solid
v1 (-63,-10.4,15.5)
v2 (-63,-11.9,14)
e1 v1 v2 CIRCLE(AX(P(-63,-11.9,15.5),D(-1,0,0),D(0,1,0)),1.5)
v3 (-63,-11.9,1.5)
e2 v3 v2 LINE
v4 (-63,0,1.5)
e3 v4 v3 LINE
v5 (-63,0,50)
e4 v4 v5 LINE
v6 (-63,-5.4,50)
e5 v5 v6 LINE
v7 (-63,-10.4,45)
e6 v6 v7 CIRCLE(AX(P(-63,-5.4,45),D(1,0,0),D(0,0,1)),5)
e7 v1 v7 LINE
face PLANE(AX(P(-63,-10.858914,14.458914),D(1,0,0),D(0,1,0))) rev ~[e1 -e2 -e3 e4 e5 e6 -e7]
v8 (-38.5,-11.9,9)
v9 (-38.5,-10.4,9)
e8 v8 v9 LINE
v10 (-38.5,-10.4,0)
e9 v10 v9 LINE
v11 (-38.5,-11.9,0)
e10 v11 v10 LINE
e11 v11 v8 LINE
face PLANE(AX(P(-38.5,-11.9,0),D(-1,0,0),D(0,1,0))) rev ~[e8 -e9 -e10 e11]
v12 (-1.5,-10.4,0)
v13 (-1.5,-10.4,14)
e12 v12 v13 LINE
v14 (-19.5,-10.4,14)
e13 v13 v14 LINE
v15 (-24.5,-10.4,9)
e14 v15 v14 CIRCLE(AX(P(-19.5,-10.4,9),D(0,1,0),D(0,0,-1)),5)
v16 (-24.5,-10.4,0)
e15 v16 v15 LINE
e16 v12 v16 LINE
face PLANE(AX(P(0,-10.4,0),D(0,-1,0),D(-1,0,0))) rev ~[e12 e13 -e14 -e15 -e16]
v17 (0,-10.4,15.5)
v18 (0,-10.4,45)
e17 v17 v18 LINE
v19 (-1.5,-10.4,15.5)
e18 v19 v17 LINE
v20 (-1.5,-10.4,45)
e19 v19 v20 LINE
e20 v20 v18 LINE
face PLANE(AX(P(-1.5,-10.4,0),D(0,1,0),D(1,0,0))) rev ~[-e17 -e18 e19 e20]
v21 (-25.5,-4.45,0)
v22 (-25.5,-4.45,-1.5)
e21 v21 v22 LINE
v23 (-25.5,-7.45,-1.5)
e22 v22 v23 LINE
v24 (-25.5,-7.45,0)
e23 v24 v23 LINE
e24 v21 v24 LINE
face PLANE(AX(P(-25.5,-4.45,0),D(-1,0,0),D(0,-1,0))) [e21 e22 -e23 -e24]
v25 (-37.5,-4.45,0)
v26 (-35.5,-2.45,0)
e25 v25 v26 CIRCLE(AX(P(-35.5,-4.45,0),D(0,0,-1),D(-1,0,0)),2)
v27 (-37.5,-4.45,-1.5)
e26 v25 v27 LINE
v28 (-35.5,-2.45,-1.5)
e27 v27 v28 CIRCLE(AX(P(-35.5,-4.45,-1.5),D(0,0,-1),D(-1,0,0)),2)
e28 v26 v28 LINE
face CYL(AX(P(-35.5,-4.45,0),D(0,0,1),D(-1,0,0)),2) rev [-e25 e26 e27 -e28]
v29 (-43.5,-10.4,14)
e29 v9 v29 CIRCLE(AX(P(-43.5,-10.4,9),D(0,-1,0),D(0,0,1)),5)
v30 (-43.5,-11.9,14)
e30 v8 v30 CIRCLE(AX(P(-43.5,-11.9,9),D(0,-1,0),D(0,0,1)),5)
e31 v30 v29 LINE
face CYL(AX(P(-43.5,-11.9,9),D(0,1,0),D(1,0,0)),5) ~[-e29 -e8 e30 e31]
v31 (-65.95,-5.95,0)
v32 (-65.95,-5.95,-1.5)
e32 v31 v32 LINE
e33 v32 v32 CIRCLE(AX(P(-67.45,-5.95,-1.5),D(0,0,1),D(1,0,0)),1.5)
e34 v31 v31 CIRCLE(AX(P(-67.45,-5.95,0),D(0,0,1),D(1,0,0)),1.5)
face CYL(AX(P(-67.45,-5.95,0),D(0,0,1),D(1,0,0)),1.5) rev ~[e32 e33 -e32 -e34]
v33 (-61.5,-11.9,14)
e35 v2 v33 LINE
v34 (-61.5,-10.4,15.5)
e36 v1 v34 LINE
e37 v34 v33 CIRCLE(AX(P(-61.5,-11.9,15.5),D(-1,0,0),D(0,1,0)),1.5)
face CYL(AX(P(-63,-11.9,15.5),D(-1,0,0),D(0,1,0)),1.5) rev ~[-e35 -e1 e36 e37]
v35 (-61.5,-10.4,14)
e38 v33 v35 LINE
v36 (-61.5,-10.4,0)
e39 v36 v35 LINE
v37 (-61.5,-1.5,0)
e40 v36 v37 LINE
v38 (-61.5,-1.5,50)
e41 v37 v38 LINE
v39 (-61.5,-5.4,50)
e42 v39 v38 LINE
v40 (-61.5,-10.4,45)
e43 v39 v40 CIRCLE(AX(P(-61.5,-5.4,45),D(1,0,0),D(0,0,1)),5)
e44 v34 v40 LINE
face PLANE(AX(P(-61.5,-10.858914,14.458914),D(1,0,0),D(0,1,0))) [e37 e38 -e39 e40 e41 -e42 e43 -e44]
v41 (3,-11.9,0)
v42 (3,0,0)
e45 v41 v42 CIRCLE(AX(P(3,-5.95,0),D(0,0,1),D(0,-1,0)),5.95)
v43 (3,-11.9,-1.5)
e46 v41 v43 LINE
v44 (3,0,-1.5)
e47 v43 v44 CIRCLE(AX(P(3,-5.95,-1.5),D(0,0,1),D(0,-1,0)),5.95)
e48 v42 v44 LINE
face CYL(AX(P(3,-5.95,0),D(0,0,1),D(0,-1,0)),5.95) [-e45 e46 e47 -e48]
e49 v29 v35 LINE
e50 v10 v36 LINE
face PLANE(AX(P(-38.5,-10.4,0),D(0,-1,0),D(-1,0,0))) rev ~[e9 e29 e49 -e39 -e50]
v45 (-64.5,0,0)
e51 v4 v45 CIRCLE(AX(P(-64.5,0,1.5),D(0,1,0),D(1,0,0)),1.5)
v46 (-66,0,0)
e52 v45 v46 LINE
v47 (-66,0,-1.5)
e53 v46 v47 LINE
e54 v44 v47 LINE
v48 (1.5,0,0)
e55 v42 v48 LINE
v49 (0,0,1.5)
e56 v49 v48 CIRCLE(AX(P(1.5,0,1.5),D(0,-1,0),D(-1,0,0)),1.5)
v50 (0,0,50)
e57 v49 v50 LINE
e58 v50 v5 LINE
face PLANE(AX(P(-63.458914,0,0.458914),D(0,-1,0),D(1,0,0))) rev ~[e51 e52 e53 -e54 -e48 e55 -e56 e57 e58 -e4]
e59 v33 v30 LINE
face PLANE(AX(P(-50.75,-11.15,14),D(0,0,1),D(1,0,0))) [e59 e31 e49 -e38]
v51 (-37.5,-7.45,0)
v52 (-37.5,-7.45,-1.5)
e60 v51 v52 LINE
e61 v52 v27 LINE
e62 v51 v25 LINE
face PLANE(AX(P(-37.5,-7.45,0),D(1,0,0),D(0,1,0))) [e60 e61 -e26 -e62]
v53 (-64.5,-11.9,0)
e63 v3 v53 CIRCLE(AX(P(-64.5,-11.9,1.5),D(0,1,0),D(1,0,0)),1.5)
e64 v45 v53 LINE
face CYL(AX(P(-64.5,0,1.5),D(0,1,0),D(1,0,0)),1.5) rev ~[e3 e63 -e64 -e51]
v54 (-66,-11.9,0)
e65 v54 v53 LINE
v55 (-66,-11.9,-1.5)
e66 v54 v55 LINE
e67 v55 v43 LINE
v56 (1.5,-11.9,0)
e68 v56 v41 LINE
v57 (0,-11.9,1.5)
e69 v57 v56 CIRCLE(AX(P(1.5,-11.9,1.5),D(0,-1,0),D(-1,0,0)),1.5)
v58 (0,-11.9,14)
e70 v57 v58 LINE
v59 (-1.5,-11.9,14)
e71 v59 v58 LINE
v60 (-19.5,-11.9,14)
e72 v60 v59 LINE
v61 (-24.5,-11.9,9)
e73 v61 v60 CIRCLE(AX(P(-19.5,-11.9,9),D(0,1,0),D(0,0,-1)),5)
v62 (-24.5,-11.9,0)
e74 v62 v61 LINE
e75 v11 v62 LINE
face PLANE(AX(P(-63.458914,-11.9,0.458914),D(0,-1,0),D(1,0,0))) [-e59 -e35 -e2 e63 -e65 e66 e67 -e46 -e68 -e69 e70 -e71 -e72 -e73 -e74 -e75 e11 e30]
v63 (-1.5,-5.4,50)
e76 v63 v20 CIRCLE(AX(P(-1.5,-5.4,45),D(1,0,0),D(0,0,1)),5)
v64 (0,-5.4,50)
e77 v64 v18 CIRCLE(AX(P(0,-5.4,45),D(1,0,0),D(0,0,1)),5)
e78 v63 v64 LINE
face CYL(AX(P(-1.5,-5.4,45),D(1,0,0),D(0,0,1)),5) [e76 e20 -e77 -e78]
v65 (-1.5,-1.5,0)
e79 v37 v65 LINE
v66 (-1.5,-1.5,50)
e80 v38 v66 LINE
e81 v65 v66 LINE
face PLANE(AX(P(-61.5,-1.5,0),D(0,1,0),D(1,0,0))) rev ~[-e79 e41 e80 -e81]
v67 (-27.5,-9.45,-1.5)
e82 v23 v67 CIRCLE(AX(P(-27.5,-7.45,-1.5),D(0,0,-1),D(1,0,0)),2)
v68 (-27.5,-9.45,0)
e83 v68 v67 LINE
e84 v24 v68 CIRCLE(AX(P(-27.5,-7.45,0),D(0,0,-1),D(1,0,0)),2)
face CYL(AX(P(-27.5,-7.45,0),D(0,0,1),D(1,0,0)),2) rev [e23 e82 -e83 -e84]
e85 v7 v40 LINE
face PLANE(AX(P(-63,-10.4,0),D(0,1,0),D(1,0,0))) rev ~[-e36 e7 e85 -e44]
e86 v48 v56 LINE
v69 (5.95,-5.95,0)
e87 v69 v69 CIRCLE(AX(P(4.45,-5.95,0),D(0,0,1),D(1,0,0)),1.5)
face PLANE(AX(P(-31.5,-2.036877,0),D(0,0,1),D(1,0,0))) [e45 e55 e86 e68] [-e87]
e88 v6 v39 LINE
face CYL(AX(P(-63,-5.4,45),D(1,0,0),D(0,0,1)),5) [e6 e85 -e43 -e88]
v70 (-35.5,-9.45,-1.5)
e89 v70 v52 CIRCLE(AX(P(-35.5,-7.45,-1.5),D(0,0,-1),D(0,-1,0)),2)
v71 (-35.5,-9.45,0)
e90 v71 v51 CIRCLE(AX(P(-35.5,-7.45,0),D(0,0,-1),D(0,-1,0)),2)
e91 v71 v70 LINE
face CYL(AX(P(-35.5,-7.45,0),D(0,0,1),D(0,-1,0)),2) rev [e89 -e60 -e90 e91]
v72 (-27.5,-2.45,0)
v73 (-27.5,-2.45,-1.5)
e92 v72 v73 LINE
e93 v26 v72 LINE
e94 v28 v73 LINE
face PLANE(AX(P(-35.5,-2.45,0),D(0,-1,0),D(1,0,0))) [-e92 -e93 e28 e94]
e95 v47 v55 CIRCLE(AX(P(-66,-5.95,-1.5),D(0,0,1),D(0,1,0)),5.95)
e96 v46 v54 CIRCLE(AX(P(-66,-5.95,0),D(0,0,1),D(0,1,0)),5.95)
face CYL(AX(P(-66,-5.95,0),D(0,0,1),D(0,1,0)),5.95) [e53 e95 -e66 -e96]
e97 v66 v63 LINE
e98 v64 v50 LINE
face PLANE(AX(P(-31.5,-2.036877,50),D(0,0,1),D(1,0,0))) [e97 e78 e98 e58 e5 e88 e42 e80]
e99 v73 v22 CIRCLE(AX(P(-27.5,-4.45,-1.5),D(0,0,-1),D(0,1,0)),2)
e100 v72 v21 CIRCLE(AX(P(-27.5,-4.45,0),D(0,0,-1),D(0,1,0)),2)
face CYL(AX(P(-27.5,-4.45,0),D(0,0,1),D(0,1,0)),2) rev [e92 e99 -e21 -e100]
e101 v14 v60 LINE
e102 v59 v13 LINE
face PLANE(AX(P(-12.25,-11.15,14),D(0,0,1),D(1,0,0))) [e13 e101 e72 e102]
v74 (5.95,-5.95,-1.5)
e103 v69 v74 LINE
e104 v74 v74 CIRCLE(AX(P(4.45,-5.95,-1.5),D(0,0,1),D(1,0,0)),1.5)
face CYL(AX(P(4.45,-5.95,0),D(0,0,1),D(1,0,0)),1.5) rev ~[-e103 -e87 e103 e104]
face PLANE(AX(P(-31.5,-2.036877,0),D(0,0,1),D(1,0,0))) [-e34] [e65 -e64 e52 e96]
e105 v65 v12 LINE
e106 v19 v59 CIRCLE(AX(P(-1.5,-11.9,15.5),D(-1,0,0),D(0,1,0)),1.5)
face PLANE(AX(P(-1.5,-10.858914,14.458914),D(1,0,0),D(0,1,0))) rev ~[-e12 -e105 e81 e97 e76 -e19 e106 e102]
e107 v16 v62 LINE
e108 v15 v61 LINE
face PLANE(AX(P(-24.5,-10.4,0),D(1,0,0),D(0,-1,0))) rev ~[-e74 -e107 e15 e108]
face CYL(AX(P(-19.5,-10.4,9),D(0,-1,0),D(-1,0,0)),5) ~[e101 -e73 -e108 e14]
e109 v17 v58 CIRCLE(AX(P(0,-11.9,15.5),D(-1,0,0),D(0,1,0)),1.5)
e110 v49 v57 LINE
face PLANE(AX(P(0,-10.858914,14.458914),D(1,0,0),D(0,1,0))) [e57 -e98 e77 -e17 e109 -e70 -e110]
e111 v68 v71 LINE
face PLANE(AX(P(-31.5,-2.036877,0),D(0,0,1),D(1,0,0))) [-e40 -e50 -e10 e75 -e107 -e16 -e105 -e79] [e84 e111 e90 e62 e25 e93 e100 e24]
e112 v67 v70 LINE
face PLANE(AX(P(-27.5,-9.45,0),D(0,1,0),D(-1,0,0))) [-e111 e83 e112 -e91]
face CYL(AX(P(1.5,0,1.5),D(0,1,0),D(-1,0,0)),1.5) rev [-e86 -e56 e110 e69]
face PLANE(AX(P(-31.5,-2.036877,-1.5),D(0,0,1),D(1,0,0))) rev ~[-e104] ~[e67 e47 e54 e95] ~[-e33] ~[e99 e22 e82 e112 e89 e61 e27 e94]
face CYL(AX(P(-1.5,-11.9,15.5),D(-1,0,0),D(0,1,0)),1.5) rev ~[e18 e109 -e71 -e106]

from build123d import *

# Parameters (mm, degrees)
F1_W        = 14
F1_H        = 1.5
F1_R        = 1.5
F2_DEPTH    = 1.5
F3_DEPTH    = 14
F4_DEPTH    = 50
F5_R        = 5
F6_T1_DEPTH = 1.5
F6_T3_DEPTH = 11.9
F6_T5_DEPTH = 1.5


# Not quite as in the source:
# - a fillet or chamfer that OpenCascade refuses, or shapes differently, is made with other operations: its cross-section is extruded or revolved along the edge and cut away or added
# - a feature names something its author has since deleted; it is built from what else it names


with BuildPart() as f2:
    # F1 (on Top) → F2 (new body)
    with BuildSketch(Plane.XY):
        Polygon((-61.5, -10.4), (-61.5, -1.5), (-1.5, -1.5), (-1.5, -10.4), (0, -10.4), (0, 0), (-63, 0), (-63, -10.4), align=None)
        Polygon((-38.5, -10.4), (-61.5, -10.4), (-63, -10.4), (-63, -11.9), (-38.5, -11.9), align=None)
        with Locations((-31.5, -11.15)):
            Rectangle(F1_W, F1_H)
        Polygon((0, -10.4), (-1.5, -10.4), (-24.5, -10.4), (-24.5, -11.9), (0, -11.9), align=None)
        Polygon((-1.5, -1.5), (-61.5, -1.5), (-61.5, -10.4), (-38.5, -10.4), (-24.5, -10.4), (-1.5, -10.4), align=None)
        with BuildLine():
            ThreePointArc((-37.5, -4.45), (-36.9142135624, -3.0357864376), (-35.5, -2.45))
            Line((-35.5, -2.45), (-27.5, -2.45))
            ThreePointArc((-27.5, -2.45), (-26.0857864376, -3.0357864376), (-25.5, -4.45))
            Line((-25.5, -4.45), (-25.5, -7.45))
            ThreePointArc((-25.5, -7.45), (-26.0857864376, -8.8642135624), (-27.5, -9.45))
            Line((-27.5, -9.45), (-35.5, -9.45))
            ThreePointArc((-35.5, -9.45), (-36.9142135624, -8.8642135624), (-37.5, -7.45))
            Line((-37.5, -7.45), (-37.5, -4.45))
        make_face(mode=Mode.SUBTRACT)
        with BuildLine():
            Line((-63, -11.9), (-63, -10.4))
            Line((-63, -10.4), (-63, 0))
            Line((-63, 0), (-66, 0))
            ThreePointArc((-66, 0), (-71.95, -5.95), (-66, -11.9))
            Line((-66, -11.9), (-63, -11.9))
        make_face()
        with Locations((-67.45, -5.95)):
            Circle(F1_R, mode=Mode.SUBTRACT)
        with BuildLine():
            Line((0, 0), (0, -10.4))
            Line((0, -10.4), (0, -11.9))
            Line((0, -11.9), (3, -11.9))
            ThreePointArc((3, -11.9), (8.95, -5.95), (3, 0))
            Line((3, 0), (0, 0))
        make_face()
        with Locations((4.45, -5.95)):
            Circle(F1_R, mode=Mode.SUBTRACT)
    extrude(amount=-F2_DEPTH)

    # F1 (on Top) → F3 (join)
    with BuildSketch(Plane.XY):
        Polygon((0, -10.4), (-1.5, -10.4), (-24.5, -10.4), (-24.5, -11.9), (0, -11.9), align=None)
        Polygon((-38.5, -10.4), (-61.5, -10.4), (-63, -10.4), (-63, -11.9), (-38.5, -11.9), align=None)
    extrude(amount=F3_DEPTH)

    # F1 (on Top) → F4 (join)
    with BuildSketch(Plane.XY):
        Polygon((-61.5, -10.4), (-61.5, -1.5), (-1.5, -1.5), (-1.5, -10.4), (0, -10.4), (0, 0), (-63, 0), (-63, -10.4), align=None)
    extrude(amount=F4_DEPTH)

    # F5
    f5_edges = [f2.edges().sort_by_distance(p)[0] for p in [
        (-62.25, -10.4, 50),
        (-0.75, -10.4, 50),
        (-24.5, -11.15, 14),
        (-38.5, -11.15, 14),
    ]]
    fillet(f5_edges, radius=F5_R)

    # F6: fillet of radius 1.5 on 4 edges, made by hand

    # F6_s2 → F6_t1 (join)
    with BuildSketch(Plane.YZ.offset(-63)):
        with BuildLine():
            ThreePointArc((-10.4, 15.5), (-10.8393398282, 14.4393398282), (-11.9, 14))
            Line((-11.9, 14), (-10.4, 14))
            Line((-10.4, 14), (-10.4, 15.5))
        make_face()
    extrude(amount=F6_T1_DEPTH)

    # F6_s4 → F6_t3 (join)
    with BuildSketch(Plane.XZ):
        with BuildLine():
            ThreePointArc((-63, 1.5), (-63.4393398282, 0.4393398282), (-64.5, 0))
            Line((-64.5, 0), (-63, 0))
            Line((-63, 0), (-63, 1.5))
        make_face()
        with BuildLine():
            ThreePointArc((0, 1.5), (0.4393398282, 0.4393398282), (1.5, 0))
            Line((1.5, 0), (0, 0))
            Line((0, 0), (0, 1.5))
        make_face()
    extrude(amount=F6_T3_DEPTH)

    # F6_s6 → F6_t5 (join)
    with BuildSketch(Plane.YZ.offset(-1.5)):
        with BuildLine():
            ThreePointArc((-10.4, 15.5), (-10.8393398282, 14.4393398282), (-11.9, 14))
            Line((-11.9, 14), (-10.4, 14))
            Line((-10.4, 14), (-10.4, 15.5))
        make_face()
    extrude(amount=F6_T5_DEPTH)


solid = f2.part
